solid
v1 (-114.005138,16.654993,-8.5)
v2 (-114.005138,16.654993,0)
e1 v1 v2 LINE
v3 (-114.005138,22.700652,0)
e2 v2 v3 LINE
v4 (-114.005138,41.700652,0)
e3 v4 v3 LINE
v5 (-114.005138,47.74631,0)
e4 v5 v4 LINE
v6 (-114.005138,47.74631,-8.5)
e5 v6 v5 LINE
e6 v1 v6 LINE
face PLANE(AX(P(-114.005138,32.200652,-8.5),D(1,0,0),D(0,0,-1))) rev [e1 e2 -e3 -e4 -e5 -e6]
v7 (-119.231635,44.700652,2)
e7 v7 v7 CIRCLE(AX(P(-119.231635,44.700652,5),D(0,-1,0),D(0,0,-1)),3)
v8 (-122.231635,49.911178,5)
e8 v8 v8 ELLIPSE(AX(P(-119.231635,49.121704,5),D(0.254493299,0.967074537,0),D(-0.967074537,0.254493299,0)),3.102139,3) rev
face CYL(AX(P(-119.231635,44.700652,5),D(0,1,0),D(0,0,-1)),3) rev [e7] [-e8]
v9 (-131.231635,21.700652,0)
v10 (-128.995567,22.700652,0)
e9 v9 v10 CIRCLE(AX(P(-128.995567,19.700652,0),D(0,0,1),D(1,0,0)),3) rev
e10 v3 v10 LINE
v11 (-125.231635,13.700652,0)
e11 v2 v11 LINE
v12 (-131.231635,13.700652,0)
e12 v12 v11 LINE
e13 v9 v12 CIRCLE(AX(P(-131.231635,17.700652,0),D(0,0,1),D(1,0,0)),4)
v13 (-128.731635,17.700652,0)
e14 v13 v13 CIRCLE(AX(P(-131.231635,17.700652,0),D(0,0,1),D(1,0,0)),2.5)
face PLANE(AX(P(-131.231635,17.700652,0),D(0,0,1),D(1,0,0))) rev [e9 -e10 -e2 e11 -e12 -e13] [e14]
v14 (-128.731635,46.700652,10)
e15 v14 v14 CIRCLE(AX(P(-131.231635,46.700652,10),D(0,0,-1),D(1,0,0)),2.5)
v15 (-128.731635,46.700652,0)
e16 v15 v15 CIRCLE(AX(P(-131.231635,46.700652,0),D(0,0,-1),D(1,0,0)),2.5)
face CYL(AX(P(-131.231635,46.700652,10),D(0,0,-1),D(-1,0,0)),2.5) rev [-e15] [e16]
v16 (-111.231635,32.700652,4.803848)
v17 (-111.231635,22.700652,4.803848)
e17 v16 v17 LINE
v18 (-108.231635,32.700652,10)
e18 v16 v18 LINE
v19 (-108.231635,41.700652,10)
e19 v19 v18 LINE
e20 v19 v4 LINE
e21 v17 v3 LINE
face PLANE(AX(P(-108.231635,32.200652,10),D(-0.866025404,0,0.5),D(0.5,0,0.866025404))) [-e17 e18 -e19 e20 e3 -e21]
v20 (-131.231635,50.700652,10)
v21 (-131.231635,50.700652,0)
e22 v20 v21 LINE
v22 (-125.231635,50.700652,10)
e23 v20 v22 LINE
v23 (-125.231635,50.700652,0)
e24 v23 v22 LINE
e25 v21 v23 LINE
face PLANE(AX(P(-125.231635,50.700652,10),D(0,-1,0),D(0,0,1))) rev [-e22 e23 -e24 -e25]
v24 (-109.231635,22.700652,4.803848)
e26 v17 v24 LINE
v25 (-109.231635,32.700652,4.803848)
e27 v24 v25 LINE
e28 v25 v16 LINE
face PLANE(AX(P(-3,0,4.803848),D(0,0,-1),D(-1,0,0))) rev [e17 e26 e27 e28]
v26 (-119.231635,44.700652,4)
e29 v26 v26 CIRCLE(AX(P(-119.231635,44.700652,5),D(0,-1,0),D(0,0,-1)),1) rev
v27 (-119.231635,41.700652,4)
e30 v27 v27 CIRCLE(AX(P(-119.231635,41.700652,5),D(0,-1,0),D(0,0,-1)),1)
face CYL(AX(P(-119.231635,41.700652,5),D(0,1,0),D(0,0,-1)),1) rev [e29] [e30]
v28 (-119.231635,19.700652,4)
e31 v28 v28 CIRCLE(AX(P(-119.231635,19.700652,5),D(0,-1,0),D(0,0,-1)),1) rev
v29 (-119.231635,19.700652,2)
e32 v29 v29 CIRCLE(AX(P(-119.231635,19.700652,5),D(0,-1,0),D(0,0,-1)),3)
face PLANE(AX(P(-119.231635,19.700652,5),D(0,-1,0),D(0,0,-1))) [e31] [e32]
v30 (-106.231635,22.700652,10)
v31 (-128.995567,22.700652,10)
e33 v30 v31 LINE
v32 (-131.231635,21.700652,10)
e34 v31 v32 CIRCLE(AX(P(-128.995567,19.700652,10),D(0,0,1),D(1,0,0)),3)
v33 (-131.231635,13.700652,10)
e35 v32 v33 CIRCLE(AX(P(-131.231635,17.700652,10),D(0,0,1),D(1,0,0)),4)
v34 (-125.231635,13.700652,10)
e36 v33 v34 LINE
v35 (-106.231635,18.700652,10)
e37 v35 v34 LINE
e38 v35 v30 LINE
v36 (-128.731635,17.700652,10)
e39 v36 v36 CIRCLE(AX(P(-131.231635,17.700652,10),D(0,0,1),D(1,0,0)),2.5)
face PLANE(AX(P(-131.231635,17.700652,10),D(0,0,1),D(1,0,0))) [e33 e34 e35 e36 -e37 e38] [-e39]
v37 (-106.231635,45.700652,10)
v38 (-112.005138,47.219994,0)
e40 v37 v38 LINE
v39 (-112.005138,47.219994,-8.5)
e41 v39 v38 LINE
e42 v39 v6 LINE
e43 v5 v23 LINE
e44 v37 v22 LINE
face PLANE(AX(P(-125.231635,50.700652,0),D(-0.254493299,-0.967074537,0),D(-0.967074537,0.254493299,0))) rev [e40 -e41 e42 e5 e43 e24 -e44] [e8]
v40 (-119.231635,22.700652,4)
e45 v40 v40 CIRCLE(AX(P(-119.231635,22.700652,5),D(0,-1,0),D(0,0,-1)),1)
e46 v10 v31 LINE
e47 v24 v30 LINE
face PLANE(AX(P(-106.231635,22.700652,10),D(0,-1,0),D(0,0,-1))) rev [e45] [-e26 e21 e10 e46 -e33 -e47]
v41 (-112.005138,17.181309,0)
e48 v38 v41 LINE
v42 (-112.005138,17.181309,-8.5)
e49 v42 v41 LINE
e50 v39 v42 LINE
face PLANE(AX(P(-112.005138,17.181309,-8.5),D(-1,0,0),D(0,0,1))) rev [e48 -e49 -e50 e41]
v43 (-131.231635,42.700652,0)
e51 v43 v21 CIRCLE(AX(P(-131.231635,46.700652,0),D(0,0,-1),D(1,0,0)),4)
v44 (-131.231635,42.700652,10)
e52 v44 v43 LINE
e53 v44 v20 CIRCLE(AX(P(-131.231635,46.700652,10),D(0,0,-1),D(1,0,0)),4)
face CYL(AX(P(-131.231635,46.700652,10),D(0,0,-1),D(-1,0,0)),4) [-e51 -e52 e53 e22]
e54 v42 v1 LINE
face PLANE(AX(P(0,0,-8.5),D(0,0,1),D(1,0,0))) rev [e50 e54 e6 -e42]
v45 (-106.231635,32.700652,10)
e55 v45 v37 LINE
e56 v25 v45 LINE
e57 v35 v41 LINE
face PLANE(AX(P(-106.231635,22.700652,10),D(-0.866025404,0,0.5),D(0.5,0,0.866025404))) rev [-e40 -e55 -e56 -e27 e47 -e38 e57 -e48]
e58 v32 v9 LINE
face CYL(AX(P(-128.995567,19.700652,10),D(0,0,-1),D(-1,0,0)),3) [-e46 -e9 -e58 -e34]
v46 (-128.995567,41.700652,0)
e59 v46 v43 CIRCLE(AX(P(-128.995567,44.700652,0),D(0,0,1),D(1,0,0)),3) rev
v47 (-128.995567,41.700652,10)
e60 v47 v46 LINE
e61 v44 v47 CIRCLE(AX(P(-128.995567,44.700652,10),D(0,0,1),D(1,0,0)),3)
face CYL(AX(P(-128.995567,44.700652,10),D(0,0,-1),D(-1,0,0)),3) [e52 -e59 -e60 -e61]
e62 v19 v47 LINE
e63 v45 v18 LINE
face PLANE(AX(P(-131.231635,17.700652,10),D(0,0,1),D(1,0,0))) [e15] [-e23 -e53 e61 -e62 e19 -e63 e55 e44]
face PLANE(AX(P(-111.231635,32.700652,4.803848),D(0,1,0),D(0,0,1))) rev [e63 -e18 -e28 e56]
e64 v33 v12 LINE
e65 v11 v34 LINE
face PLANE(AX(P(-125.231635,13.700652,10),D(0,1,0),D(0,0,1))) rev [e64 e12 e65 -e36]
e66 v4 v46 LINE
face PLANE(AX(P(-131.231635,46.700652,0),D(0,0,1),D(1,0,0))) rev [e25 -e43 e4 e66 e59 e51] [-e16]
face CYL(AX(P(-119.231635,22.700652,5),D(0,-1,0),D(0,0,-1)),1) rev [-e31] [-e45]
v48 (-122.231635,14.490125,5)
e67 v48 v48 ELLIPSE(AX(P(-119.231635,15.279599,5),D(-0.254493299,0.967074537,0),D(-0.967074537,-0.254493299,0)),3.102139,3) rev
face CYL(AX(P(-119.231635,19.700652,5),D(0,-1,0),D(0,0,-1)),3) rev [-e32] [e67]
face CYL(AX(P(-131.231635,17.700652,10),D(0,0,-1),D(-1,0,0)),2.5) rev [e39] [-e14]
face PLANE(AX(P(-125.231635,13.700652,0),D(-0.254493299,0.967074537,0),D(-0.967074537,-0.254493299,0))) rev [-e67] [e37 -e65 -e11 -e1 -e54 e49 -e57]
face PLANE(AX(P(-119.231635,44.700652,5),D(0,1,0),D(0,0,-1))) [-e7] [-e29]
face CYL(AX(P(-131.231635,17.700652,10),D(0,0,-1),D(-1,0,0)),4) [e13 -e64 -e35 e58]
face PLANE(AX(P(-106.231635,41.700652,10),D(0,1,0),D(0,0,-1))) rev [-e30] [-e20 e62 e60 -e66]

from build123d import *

# Parameters (mm, degrees)
CROQUIS1_R              = 2.5
SALIENTE_EXTRUIR1_DEPTH = 10
CROQUIS2_R              = 1
CORTAR_EXTRUIR1_DEPTH   = 4
SALIENTE_EXTRUIR2_DEPTH = 13.5
CROQUIS4_R              = 3
CORTAR_EXTRUIR2_DEPTH   = 1
SALIENTE_EXTRUIR3_START = 5
CROQUIS6_R              = 3
SALIENTE_EXTRUIR3_DEPTH = 5
CORTAR_EXTRUIR3_DEPTH   = 10
SALIENTE_EXTRUIR4_DEPTH = 8.5
CROQUIS5_W              = 2
CROQUIS5_H              = 10
CORTAR_EXTRUIR4_DEPTH   = 6
REDONDEO1_R             = 3


with BuildPart() as part:
    # Croquis1 → Saliente-Extruir1 (new body)
    with BuildSketch(Plane.XY):
        with BuildLine():
            Line((-106.231635218, 22.700651543), (-131.231635218, 22.700651543))
            Line((-131.231635218, 22.700651543), (-131.231635218, 21.700651543))
            ThreePointArc((-131.231635218, 21.700651543), (-135.231635218, 17.700651543), (-131.231635218, 13.700651543))
            Line((-131.231635218, 13.700651543), (-125.231635218, 13.700651543))
            Line((-125.231635218, 13.700651543), (-125.231635218, 18.700651543))
            Line((-125.231635218, 18.700651543), (-106.231635218, 18.700651543))
            Line((-106.231635218, 18.700651543), (-106.231635218, 22.700651543))
        make_face()
        with Locations((-131.231635218, 17.700651543)):
            Circle(CROQUIS1_R, mode=Mode.SUBTRACT)
    extrude(amount=SALIENTE_EXTRUIR1_DEPTH)

    # Croquis2 → Cortar-Extruir1 (cut)
    with BuildSketch(Plane.XZ.offset(-18.700651543)):
        with Locations(Location((-119.231635218, 5, 0), (0, 0, 270))):
            Circle(CROQUIS2_R)
        Polygon((-106.231635218, 0), (-106.231635218, 10), (-112.00513791, 0), align=None)
    extrude(amount=-CORTAR_EXTRUIR1_DEPTH, mode=Mode.SUBTRACT)

    # Croquis3 → Saliente-Extruir2 (add)
    with BuildSketch(Plane.XZ.offset(-18.700651543)):
        Polygon((-106.231635218, 10), (-108.231635218, 10), (-114.00513791, 0), (-112.00513791, 0), align=None)
    extrude(amount=-SALIENTE_EXTRUIR2_DEPTH)

    # Croquis4 → Cortar-Extruir2 (cut)
    with BuildSketch(Plane.XZ.offset(-18.700651543)):
        with Locations(Location((-119.231635218, 5, 0), (0, 0, 270))):
            Circle(CROQUIS4_R)
    extrude(amount=-CORTAR_EXTRUIR2_DEPTH, mode=Mode.SUBTRACT)

    # Croquis6 → Saliente-Extruir3 (add)
    with BuildSketch(Plane.XZ.offset(-18.700651543).offset(SALIENTE_EXTRUIR3_START)):
        Polygon((-106.231635218, 10), (-125.231635218, 10), (-125.231635218, 0), (-112.00513791, 0), align=None)
        with Locations(Location((-119.231635218, 5, 0), (0, 0, 270))):
            Circle(CROQUIS6_R, mode=Mode.SUBTRACT)
    extrude(amount=-SALIENTE_EXTRUIR3_DEPTH)

    # Croquis7 → Cortar-Extruir3 (cut)
    with BuildSketch(Plane.XY.offset(10)):
        Polygon((-106.231635218, 18.700651543), (-106.231635218, 13.700651543), (-125.231635218, 13.700651543), align=None)
    extrude(amount=-CORTAR_EXTRUIR3_DEPTH, mode=Mode.SUBTRACT)

    # Croquis8 → Saliente-Extruir4 (add)
    with BuildSketch(Plane(origin=(0, 0, 0), x_dir=(-1, 0, 0), z_dir=(0, 0, -1))):
        Polygon((112.00513791, 17.181308729), (112.00513791, 32.200651543), (114.00513791, 32.200651543), (114.00513791, 16.65499294), align=None)
    extrude(amount=SALIENTE_EXTRUIR4_DEPTH)

    # Simetría1: part across plane


with BuildPart() as part_1:
    add(part.part)
    add(part.part.mirror(Plane(origin=(0, 32.200651543, 0), x_dir=(0, 0, 1), z_dir=(0, -1, 0))))

    # Croquis5 → Cortar-Extruir4 (cut, along a direction that is not the sketch's normal)
    with BuildSketch(Plane.XY.offset(10)):
        with Locations((-107.231635218, 27.700651543)):
            Rectangle(CROQUIS5_W, CROQUIS5_H)
    extrude(amount=-CORTAR_EXTRUIR4_DEPTH, dir=(0.49999999999999506, 0, 0.8660254037844416), mode=Mode.SUBTRACT)

    # Redondeo1
    # the kernel refuses this fillet: 3 mm, written as the material it takes off along each edge
    with BuildSketch(Plane(origin=(-131.231635218, 41.700651543, -5.590169944), x_dir=(1, 0, 0), z_dir=(0, 0, 1))) as redondeo1_piece_1:
        with BuildLine():
            CenterArc((2.236067977, 3), REDONDEO1_R, 221.810314896, 48.189685104)
            Line((0, 1), (-0.04472136, 0.96))
            ThreePointArc((-0.04472136, 0.96), (-0.06, 0.5), (-0.06, 0))
            Line((-0.06, 0), (0, -0.06))
            Line((0, -0.06), (2.236067977, -0.06))
            Line((2.236067977, -0.06), (2.236067977, 0))
        make_face()
    extrude(amount=21.180339887, mode=Mode.SUBTRACT)
    with BuildSketch(Plane(origin=(-131.231635218, 22.700651543, -5.590169944), x_dir=(0, -1, 0), z_dir=(0, 0, 1))) as redondeo1_piece_2:
        with BuildLine():
            CenterArc((3, 2.236067977), REDONDEO1_R, 180, 48.189685104)
            Line((0, 2.236067977), (-0.06, 2.236067977))
            Line((-0.06, 2.236067977), (-0.06, 0))
            Line((-0.06, 0), (0, -0.06))
            ThreePointArc((0, -0.06), (0.5, -0.06), (0.96, -0.04472136))
            Line((0.96, -0.04472136), (1, 0))
        make_face()
    extrude(amount=21.180339887, mode=Mode.SUBTRACT)


solid = part_1.part
